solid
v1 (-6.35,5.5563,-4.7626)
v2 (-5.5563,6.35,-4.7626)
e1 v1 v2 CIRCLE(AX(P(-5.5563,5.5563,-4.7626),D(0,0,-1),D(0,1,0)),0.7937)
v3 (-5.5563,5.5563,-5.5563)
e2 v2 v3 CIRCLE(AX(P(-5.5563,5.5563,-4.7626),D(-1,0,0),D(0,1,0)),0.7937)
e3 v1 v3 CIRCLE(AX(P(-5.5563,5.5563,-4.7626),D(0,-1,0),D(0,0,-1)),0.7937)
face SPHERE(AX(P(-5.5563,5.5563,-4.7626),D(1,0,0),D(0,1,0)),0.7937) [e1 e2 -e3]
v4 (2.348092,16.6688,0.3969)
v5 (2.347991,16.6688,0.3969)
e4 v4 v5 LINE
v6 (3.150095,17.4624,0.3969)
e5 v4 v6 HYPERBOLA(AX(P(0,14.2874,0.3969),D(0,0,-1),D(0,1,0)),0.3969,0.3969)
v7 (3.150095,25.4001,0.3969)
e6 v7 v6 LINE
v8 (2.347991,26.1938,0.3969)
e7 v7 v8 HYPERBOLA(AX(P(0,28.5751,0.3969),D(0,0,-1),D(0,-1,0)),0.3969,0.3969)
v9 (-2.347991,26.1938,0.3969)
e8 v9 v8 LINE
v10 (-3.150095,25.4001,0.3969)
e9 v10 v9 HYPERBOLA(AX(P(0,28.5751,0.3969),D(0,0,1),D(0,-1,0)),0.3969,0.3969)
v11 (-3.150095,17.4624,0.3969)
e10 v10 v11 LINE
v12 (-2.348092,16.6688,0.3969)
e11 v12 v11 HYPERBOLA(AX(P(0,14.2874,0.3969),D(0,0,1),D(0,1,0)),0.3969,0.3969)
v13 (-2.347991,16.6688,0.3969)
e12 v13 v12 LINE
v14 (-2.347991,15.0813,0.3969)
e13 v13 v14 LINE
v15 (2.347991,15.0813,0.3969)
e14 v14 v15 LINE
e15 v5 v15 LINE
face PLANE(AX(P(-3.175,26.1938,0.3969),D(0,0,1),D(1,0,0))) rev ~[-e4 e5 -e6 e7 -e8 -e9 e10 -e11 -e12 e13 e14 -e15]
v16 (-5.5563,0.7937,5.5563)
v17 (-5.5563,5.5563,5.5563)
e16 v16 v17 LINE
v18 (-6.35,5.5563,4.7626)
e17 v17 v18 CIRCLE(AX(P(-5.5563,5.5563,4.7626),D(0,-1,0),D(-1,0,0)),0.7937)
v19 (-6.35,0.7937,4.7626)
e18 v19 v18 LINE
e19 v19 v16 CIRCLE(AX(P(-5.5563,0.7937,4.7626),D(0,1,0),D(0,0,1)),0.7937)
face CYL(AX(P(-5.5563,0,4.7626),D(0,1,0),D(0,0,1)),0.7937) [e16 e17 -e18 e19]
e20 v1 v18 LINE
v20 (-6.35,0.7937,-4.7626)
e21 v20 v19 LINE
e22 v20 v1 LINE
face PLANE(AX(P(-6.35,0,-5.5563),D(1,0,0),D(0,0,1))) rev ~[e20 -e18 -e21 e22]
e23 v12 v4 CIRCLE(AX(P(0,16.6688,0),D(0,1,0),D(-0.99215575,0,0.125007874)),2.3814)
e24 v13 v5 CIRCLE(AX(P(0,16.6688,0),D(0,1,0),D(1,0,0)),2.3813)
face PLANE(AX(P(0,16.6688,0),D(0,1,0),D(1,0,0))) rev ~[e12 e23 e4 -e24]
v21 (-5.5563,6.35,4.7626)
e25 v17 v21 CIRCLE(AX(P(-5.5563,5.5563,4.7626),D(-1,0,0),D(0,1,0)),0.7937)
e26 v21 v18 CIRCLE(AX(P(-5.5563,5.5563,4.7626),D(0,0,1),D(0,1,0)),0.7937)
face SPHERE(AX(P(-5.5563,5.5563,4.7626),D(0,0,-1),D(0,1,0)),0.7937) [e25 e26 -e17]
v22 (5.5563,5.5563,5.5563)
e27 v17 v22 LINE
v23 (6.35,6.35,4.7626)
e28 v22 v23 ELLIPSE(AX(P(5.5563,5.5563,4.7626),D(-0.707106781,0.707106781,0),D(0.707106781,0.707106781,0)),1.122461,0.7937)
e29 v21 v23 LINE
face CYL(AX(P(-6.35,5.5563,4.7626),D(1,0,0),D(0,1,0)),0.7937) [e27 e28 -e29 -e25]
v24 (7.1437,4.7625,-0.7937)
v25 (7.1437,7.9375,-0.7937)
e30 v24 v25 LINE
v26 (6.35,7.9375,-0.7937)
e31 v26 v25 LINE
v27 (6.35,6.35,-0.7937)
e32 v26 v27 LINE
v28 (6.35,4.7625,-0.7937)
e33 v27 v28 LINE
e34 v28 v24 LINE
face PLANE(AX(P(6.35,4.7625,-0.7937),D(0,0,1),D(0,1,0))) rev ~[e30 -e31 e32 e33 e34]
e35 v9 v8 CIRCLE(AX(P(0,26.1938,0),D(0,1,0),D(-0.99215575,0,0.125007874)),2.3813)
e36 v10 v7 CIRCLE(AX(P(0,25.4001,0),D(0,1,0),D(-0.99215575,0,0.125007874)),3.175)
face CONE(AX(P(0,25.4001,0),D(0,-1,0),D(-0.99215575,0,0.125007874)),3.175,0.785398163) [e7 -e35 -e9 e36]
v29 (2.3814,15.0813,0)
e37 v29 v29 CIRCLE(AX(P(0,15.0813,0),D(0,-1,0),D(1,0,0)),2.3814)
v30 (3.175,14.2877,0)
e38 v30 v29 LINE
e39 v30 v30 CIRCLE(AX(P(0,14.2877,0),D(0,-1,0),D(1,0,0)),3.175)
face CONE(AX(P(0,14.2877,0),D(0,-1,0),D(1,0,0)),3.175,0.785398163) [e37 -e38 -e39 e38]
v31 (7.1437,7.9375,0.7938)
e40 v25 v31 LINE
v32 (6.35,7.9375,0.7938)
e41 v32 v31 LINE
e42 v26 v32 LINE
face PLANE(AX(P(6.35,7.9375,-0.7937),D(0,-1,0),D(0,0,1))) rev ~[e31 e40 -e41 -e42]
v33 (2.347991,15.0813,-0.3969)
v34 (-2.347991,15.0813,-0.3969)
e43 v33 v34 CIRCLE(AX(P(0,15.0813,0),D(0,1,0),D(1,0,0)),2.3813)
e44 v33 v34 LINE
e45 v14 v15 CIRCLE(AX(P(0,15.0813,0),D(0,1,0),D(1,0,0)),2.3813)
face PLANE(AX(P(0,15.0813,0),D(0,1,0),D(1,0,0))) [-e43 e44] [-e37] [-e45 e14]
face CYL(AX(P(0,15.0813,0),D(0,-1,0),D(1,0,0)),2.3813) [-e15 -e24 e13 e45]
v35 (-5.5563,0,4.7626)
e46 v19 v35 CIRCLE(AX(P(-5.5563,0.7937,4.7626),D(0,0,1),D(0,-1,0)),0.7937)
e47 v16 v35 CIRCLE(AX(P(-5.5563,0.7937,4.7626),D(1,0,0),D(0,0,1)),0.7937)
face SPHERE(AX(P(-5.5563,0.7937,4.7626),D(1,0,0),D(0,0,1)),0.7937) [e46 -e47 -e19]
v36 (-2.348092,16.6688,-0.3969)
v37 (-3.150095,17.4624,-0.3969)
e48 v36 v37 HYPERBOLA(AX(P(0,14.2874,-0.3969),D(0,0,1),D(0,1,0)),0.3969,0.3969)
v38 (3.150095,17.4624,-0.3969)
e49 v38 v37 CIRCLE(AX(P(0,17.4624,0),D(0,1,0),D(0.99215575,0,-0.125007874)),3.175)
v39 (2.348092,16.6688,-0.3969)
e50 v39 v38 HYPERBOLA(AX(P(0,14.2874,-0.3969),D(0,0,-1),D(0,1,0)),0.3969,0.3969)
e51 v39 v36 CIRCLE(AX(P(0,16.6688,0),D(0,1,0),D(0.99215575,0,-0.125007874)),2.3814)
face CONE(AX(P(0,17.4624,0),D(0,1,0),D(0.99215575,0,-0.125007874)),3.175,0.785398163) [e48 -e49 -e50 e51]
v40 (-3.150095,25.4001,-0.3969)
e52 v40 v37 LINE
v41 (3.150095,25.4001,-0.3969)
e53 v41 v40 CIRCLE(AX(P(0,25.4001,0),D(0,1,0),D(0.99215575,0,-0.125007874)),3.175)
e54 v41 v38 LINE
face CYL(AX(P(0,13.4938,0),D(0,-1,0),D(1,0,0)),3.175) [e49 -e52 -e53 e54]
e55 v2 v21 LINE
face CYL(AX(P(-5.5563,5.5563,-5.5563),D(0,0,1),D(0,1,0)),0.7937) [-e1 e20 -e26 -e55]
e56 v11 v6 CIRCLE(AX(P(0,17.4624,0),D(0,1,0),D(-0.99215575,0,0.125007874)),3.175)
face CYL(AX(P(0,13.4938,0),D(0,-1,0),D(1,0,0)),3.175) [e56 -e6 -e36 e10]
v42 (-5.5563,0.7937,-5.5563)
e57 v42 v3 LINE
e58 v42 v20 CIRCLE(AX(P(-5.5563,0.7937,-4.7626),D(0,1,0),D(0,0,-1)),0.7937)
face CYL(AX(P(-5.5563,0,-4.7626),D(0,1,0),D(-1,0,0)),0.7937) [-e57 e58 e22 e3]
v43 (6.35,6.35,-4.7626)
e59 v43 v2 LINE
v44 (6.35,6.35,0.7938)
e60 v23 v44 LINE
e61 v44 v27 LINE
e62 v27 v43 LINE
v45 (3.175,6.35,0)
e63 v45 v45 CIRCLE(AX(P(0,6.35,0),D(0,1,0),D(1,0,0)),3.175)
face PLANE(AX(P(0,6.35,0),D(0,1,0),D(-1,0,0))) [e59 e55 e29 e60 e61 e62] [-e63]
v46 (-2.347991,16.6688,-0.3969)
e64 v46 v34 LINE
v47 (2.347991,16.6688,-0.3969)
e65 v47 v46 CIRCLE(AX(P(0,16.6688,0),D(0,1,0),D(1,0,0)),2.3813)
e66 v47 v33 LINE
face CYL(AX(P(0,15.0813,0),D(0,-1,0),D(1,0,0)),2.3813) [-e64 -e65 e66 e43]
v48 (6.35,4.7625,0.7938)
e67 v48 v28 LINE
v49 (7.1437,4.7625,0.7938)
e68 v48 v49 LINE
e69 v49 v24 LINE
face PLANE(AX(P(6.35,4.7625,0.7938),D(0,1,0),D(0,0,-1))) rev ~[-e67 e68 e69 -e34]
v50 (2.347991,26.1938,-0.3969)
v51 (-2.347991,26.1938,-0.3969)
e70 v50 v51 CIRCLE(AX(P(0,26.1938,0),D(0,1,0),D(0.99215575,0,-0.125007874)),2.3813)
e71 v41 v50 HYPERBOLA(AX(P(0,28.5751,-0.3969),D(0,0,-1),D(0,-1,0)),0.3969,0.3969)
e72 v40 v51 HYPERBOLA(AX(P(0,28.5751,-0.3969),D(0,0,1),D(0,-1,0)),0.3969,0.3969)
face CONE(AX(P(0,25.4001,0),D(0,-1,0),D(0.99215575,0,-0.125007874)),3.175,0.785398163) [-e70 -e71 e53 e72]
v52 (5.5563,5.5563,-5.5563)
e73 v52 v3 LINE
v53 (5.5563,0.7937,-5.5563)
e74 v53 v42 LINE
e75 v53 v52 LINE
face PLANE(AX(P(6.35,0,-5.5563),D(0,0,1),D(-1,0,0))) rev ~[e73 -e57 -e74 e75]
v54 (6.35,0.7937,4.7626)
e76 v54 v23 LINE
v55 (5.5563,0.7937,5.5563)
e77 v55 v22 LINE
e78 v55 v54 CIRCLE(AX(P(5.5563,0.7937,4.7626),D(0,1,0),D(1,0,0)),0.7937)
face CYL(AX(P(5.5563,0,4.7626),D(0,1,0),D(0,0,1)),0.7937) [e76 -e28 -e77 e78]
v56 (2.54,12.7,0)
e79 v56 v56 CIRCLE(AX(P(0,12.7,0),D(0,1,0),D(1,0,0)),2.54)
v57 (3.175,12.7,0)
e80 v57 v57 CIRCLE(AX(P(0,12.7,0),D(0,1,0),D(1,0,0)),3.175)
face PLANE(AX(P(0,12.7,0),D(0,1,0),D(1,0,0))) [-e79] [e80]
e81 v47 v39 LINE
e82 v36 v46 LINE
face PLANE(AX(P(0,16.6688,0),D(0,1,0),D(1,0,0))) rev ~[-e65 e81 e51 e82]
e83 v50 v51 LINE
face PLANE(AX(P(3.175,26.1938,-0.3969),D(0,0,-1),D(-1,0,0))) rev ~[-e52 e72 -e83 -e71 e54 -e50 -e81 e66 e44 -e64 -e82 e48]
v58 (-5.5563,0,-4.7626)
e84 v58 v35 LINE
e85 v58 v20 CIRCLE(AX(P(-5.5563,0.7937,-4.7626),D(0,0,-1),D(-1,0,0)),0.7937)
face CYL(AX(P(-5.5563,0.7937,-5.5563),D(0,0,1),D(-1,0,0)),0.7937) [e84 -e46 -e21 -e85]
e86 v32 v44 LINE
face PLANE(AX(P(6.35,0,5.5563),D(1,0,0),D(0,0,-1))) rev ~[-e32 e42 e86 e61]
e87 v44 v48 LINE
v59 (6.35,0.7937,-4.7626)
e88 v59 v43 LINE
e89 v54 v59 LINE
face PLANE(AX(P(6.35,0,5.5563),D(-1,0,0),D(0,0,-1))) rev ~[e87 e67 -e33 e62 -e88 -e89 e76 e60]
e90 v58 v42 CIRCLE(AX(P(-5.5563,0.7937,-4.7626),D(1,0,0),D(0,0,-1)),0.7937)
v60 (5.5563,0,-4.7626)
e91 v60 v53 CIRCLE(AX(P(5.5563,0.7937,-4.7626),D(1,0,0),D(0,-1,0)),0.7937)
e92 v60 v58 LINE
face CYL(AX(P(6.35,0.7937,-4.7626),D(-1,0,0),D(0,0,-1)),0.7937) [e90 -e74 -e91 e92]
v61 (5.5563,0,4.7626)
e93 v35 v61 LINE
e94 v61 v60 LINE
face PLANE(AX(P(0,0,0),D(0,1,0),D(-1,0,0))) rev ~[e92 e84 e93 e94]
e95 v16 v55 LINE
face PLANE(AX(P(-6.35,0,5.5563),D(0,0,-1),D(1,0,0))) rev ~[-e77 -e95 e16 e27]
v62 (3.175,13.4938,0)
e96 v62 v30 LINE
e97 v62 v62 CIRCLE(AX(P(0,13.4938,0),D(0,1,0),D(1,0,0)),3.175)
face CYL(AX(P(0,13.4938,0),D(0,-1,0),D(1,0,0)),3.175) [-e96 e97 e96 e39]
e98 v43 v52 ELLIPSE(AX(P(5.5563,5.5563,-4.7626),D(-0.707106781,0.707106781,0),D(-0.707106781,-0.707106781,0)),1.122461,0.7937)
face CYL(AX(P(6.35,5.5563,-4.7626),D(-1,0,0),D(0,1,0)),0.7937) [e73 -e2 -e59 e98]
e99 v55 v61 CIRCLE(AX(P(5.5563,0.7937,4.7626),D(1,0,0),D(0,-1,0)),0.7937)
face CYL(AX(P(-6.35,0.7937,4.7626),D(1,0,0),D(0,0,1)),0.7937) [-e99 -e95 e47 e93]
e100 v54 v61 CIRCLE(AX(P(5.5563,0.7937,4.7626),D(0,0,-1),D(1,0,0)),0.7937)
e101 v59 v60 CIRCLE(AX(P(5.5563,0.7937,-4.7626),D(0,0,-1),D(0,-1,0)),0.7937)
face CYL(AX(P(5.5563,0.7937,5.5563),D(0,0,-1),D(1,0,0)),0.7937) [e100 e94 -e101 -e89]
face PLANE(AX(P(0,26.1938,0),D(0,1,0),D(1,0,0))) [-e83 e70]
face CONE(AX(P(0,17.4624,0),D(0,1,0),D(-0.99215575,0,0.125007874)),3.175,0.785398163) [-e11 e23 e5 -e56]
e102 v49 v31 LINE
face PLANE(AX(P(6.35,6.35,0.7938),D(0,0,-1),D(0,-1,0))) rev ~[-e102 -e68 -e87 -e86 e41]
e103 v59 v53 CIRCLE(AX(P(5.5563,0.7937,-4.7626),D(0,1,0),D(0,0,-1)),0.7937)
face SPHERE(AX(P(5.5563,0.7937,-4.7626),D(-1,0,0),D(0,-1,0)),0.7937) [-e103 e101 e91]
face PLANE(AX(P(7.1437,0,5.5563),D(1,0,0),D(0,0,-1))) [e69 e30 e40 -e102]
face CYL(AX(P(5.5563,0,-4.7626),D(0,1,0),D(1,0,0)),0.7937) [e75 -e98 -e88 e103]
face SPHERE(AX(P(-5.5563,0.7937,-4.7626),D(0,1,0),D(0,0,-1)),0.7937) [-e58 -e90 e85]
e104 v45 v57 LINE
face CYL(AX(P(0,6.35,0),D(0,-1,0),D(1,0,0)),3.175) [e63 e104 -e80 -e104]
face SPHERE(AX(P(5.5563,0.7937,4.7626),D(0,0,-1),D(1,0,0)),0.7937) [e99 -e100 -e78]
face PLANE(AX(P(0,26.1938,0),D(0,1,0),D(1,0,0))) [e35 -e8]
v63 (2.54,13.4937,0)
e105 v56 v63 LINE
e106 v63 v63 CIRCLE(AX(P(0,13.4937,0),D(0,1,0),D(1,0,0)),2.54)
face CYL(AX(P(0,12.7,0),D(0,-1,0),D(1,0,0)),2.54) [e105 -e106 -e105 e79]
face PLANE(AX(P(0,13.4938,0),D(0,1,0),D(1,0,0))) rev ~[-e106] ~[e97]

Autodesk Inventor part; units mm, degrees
ref_plane "YZ Plane" through (0, 0, 0) normal (1, 0, 0) x (0, 1, 0)
ref_plane "XZ Plane" through (0, 0, 0) normal (0, 1, 0) x (-1, 0, 0)
ref_plane "XY Plane" through (0, 0, 0) normal (0, 0, 1) x (1, 0, 0)
sketch "Sketch1" plane through (0, 0, 0) normal (0, 1, 0) x (-1, 0, 0)
  line L0 (-6.35, 5.5563) -> (-6.35, -5.5563)
  line L1 (-6.35, -5.5563) -> (6.35, -5.5563)
  line L2 (6.35, -5.5563) -> (6.35, 5.5563)
  line L3 (6.35, 5.5563) -> (-6.35, 5.5563)
  line L4 (-6.35, 5.5563) -> (6.35, -5.5563) construction
  line L5 (-6.35, -5.5563) -> (6.35, 5.5563) construction
  point P0 (0, 0)
  dimension "d0" = 11.1125
  dimension "d1" = 12.7
extrude "Extrusion1" add sketch "Sketch1" along normal blind 6.35
sketch "Sketch3" plane through (0, 6.35, 0) normal (0, 1, 0) x (1, 0, 0)
  circle A0 centre (0, 0) radius 3.175
  dimension "d8" = 6.35
extrude "Extrusion3" add sketch "Sketch3" along normal blind 6.35
thread "Thread1" size "1/4-32 UNEF" class "2A" standard "ANSI Unified Screw Threads" full length
sketch "Sketch4" plane through (6.35, 0, 5.5563) normal (1, 0, 0) x (0, 0, -1)
  line L0 (4.7625, 4.7625) -> (6.35, 4.7625)
  line L1 (6.35, 4.7625) -> (6.35, 7.9375)
  line L2 (6.35, 7.9375) -> (4.7625, 7.9375)
  line L3 (4.7625, 7.9375) -> (4.7625, 4.7625)
  line L4 (0, 6.35) -> (11.1125, 6.35) projected
  line L5 (4.7625, 4.7625) -> (6.35, 7.9375) construction
  line L6 (6.35, 4.7625) -> (4.7625, 7.9375) construction
  point P0 (5.5563, 0)
  point P1 (5.5563, 6.35)
  dimension "d13" = 1.5875
  dimension "d14" = 3.175
extrude "Extrusion4" add sketch "Sketch4" along normal blind 0.7937
sketch "Sketch5" plane through (0, 12.7, 0) normal (0, 1, 0) x (1, 0, 0)
  circle A0 centre (0, 0) radius 2.54
  dimension "d17" = 5.08
extrude "Extrusion5" add sketch "Sketch5" along normal blind 0.7937
sketch "Sketch6" plane through (0, 13.4938, 0) normal (0, 1, 0) x (1, 0, 0)
  circle A0 centre (0, 0) radius 3.175
extrude "Extrusion6" add sketch "Sketch6" along normal blind 12.7
sketch "Sketch7" plane through (0, 26.1938, 0) normal (0, 1, 0) x (1, 0, 0)
  line L0 (-3.175, -0.3969) -> (3.175, -0.3969)
  line L1 (3.175, -0.3969) -> (3.175, 0.3969)
  line L2 (3.175, 0.3969) -> (-3.175, 0.3969)
  line L3 (-3.175, 0.3969) -> (-3.175, -0.3969)
  line L4 (-3.175, -0.3969) -> (3.175, 0.3969) construction
  line L5 (3.175, -0.3969) -> (-3.175, 0.3969) construction
  point P0 (0, 0)
  dimension "d22" = 0.7937
extrude "Extrusion7" cut sketch "Sketch7" against normal blind 11.1125
sketch "Sketch8" plane through (3.1501, 26.1938, 0.3969) normal (0, 0, -1) x (-1, 0, 0)
  point P0 (3.1501, -26.1938)
sketch "Sketch9" plane through (0, 15.0813, 0) normal (0, 1, 0) x (1, 0, 0)
  circle A0 centre (0, 0) radius 3.175
  circle A1 centre (0, 0) radius 2.3813
  dimension "d25" = 4.7625
extrude "Extrusion8" cut sketch "Sketch9" along normal blind 1.5875
chamfer "Chamfer1" distance 0.7937 angle 45 3 edges at (0, 16.6687, 3.175) (0, 16.6687, -3.175) (-3.175, 15.0813, 0)
chamfer "Chamfer2" distance 0.7937 angle 45 2 edges at (0, 26.1938, 3.175) (0, 26.1938, -3.175)
fillet "Fillet1" radius 0.7937 11 edges at (0, 6.35, -5.5563) (-6.35, 6.35, 0) (-6.35, 3.175, -5.5563) (0, 0, -5.5563) (6.35, 0, 0) (6.35, 3.175, 5.5563) (0, 6.35, 5.5563) (6.35, 3.175, -5.5563) (0, 0, 5.5563) (-6.35, 3.175, 5.5563) (-6.35, 0, 0)
properties part number "stepped-encoder"
